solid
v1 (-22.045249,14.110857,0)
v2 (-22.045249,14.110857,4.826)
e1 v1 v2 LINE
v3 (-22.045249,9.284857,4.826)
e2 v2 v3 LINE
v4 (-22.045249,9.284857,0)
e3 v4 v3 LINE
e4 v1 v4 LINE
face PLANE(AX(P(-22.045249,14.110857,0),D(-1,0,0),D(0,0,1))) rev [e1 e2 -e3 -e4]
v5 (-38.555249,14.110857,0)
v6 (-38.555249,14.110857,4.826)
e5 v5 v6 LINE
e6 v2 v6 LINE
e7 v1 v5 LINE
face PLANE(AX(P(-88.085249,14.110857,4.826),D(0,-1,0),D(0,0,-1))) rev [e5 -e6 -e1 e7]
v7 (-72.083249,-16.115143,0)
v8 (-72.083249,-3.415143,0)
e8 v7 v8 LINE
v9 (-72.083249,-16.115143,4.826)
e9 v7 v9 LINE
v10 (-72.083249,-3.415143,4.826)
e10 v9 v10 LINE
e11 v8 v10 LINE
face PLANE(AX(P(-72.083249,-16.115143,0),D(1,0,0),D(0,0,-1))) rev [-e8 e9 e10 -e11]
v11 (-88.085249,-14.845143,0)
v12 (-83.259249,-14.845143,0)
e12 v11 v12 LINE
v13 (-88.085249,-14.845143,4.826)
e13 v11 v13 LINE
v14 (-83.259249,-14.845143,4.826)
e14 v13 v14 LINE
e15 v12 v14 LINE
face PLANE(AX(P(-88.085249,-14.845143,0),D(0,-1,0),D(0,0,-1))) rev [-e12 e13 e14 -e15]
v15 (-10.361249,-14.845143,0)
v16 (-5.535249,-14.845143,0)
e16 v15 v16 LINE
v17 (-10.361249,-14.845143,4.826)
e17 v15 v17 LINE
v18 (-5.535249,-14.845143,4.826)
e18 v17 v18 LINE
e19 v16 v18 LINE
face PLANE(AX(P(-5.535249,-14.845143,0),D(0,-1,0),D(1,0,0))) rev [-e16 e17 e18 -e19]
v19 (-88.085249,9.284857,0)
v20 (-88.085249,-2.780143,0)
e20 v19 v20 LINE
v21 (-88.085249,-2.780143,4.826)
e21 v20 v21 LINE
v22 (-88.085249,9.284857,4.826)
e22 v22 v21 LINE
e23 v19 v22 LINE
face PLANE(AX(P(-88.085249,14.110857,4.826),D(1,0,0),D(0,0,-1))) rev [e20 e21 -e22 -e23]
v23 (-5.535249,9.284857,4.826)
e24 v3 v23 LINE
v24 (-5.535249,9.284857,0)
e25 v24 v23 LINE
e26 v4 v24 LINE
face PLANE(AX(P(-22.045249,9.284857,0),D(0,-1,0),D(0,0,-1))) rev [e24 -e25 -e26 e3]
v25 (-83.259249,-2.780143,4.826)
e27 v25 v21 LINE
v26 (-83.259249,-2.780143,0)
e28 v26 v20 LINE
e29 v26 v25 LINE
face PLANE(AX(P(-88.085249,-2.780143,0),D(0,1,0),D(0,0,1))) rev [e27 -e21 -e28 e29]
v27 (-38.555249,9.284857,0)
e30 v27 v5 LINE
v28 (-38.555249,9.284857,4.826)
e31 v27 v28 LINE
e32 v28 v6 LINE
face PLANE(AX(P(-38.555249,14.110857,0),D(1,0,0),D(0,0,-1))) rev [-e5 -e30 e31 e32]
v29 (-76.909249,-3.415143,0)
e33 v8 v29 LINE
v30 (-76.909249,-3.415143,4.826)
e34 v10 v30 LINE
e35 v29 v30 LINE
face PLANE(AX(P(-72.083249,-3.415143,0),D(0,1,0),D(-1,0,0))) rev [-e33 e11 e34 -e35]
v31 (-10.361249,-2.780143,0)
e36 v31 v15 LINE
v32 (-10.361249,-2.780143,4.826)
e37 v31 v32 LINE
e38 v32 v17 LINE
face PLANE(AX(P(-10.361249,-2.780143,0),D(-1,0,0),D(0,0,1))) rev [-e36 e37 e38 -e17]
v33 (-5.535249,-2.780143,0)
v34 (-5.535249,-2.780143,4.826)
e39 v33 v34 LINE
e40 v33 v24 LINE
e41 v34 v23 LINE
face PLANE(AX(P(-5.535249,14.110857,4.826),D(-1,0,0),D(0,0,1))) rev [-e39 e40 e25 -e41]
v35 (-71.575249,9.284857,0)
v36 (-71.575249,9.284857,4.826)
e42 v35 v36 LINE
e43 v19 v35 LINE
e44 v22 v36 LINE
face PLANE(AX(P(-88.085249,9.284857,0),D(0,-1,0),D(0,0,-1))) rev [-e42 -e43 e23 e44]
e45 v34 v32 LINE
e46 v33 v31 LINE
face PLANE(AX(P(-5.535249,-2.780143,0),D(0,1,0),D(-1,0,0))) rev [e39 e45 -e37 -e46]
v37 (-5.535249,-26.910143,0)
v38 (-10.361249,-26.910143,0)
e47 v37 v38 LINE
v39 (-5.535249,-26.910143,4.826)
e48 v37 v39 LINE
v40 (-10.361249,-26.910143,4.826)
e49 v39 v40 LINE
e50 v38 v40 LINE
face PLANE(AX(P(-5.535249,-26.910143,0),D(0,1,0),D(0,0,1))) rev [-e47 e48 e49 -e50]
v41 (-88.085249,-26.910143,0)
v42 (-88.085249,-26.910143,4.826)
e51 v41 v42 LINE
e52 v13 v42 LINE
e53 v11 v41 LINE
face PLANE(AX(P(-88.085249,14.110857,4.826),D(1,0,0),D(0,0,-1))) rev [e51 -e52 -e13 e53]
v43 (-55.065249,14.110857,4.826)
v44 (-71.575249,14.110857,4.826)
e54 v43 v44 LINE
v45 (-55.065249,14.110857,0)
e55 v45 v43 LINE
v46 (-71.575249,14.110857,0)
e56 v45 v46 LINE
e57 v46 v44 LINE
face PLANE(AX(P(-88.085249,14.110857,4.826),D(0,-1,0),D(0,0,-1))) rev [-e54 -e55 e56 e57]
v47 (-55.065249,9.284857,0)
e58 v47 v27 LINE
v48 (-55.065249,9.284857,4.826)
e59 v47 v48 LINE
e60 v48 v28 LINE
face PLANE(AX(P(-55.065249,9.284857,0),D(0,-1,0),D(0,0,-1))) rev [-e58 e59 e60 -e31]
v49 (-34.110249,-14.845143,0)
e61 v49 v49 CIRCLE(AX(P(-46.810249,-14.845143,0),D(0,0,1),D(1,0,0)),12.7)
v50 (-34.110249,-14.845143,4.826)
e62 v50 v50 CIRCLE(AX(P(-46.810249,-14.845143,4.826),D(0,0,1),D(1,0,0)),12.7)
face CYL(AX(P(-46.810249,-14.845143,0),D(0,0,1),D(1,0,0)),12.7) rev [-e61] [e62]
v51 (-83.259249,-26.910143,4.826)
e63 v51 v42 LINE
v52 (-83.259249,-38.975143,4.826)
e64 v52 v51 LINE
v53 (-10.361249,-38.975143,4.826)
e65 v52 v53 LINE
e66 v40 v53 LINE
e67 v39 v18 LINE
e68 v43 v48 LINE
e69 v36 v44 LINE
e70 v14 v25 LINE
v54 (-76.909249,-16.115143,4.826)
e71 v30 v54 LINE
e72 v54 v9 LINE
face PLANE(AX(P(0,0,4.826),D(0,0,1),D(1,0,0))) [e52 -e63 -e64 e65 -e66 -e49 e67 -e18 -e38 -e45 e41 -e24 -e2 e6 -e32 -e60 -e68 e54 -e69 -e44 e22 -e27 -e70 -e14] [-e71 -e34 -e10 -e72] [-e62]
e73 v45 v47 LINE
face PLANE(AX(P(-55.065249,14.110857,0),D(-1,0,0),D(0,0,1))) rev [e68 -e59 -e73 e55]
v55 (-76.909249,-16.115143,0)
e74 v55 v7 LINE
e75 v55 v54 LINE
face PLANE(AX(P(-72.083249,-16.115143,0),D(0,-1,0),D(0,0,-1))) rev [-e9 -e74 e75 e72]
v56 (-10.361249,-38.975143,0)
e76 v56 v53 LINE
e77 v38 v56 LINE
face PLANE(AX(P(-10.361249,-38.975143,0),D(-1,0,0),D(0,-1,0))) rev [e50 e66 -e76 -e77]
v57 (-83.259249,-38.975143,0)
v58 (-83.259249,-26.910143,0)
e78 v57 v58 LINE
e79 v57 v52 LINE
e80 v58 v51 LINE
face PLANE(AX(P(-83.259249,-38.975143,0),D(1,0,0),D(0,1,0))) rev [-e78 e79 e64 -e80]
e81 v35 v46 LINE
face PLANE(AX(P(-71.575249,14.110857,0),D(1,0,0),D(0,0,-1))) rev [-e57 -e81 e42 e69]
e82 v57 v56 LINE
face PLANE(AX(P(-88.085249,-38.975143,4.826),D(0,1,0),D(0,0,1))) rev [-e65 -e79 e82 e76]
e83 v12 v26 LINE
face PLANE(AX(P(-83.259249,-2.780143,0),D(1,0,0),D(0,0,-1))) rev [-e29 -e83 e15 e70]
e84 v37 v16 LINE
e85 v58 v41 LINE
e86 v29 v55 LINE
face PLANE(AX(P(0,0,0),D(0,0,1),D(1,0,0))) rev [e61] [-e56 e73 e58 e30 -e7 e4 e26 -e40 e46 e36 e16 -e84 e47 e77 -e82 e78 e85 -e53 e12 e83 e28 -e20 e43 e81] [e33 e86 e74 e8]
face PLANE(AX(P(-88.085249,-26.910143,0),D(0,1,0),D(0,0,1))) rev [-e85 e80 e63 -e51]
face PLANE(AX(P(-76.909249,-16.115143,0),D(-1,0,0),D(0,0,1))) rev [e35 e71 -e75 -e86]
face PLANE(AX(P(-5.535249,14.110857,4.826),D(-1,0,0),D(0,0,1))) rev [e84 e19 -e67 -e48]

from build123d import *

# Parameters (mm, degrees)
SKETCH1_W                = 82.55
SKETCH1_H                = 53.086
BOSS_EXTRUDE1_DEPTH      = 4.826
CUT_EXTRUDE1_START       = -88.085249325
CUT_EXTRUDE1_OUTLINE_W   = 4.826
CUT_EXTRUDE1_OUTLINE_H   = 4.826
CUT_EXTRUDE1_DEPTH       = 16.51
CUT_EXTRUDE1_START_2     = -55.065249325
CUT_EXTRUDE1_2_OUTLINE_W = 4.826
CUT_EXTRUDE1_2_OUTLINE_H = 4.826
CUT_EXTRUDE1_2_DEPTH     = 16.51
CUT_EXTRUDE1_START_3     = -22.045249325
CUT_EXTRUDE1_3_OUTLINE_W = 4.826
CUT_EXTRUDE1_3_OUTLINE_H = 4.826
CUT_EXTRUDE1_3_DEPTH     = 16.51
SKETCH3_W                = 4.826
SKETCH3_H                = 12.065
CUT_EXTRUDE2_DEPTH       = 97.443575108
SKETCH4_R                = 12.7
CUT_EXTRUDE3_DEPTH       = 97.443575108
SKETCH5_W                = 4.826
SKETCH5_H                = 12.7
CUT_EXTRUDE4_DEPTH       = 97.443575108


# Read off the part's stored shape, not the designer's step: Cut-Extrude1
with BuildPart() as part:
    # Sketch1 → Boss-Extrude1 (new body)
    with BuildSketch(Plane.XY):
        with Locations((-46.810249325, -12.432142782)):
            Rectangle(SKETCH1_W, SKETCH1_H)
    extrude(amount=BOSS_EXTRUDE1_DEPTH)

    # Cut-Extrude1 outline → Cut-Extrude1 (cut)
    with BuildSketch(Plane.YZ.offset(CUT_EXTRUDE1_START)):
        with Locations((11.697857218, 2.413)):
            Rectangle(CUT_EXTRUDE1_OUTLINE_W, CUT_EXTRUDE1_OUTLINE_H)
    extrude(amount=CUT_EXTRUDE1_DEPTH, mode=Mode.SUBTRACT)

    # Cut-Extrude1 2 outline → Cut-Extrude1 2 (cut)
    with BuildSketch(Plane.YZ.offset(CUT_EXTRUDE1_START_2)):
        with Locations((11.697857218, 2.413)):
            Rectangle(CUT_EXTRUDE1_2_OUTLINE_W, CUT_EXTRUDE1_2_OUTLINE_H)
    extrude(amount=CUT_EXTRUDE1_2_DEPTH, mode=Mode.SUBTRACT)

    # Cut-Extrude1 3 outline → Cut-Extrude1 3 (cut)
    with BuildSketch(Plane.YZ.offset(CUT_EXTRUDE1_START_3)):
        with Locations((11.697857218, 2.413)):
            Rectangle(CUT_EXTRUDE1_3_OUTLINE_W, CUT_EXTRUDE1_3_OUTLINE_H)
    extrude(amount=CUT_EXTRUDE1_3_DEPTH, mode=Mode.SUBTRACT)

    # Sketch3 → Cut-Extrude2 (cut, through all)
    with BuildSketch(Plane.XY.offset(4.826)):
        with Locations((-85.672249325, -32.942642782)):
            Rectangle(SKETCH3_W, SKETCH3_H)
        with Locations((-85.672249325, -8.812642782)):
            Rectangle(SKETCH3_W, SKETCH3_H)
        with Locations((-7.948249325, -32.942642782)):
            Rectangle(SKETCH3_W, SKETCH3_H)
        with Locations((-7.948249325, -8.812642782)):
            Rectangle(SKETCH3_W, SKETCH3_H)
    extrude(amount=-CUT_EXTRUDE2_DEPTH, mode=Mode.SUBTRACT)

    # Sketch4 → Cut-Extrude3 (cut, through all)
    with BuildSketch(Plane.XY.offset(4.826)):
        with Locations((-46.810249325, -14.845142782)):
            Circle(SKETCH4_R)
    extrude(amount=-CUT_EXTRUDE3_DEPTH, mode=Mode.SUBTRACT)

    # Sketch5 → Cut-Extrude4 (cut, through all)
    with BuildSketch(Plane.XY.offset(4.826)):
        with Locations((-74.496249325, -9.765142782)):
            Rectangle(SKETCH5_W, SKETCH5_H)
    extrude(amount=-CUT_EXTRUDE4_DEPTH, mode=Mode.SUBTRACT)


solid = part.part
